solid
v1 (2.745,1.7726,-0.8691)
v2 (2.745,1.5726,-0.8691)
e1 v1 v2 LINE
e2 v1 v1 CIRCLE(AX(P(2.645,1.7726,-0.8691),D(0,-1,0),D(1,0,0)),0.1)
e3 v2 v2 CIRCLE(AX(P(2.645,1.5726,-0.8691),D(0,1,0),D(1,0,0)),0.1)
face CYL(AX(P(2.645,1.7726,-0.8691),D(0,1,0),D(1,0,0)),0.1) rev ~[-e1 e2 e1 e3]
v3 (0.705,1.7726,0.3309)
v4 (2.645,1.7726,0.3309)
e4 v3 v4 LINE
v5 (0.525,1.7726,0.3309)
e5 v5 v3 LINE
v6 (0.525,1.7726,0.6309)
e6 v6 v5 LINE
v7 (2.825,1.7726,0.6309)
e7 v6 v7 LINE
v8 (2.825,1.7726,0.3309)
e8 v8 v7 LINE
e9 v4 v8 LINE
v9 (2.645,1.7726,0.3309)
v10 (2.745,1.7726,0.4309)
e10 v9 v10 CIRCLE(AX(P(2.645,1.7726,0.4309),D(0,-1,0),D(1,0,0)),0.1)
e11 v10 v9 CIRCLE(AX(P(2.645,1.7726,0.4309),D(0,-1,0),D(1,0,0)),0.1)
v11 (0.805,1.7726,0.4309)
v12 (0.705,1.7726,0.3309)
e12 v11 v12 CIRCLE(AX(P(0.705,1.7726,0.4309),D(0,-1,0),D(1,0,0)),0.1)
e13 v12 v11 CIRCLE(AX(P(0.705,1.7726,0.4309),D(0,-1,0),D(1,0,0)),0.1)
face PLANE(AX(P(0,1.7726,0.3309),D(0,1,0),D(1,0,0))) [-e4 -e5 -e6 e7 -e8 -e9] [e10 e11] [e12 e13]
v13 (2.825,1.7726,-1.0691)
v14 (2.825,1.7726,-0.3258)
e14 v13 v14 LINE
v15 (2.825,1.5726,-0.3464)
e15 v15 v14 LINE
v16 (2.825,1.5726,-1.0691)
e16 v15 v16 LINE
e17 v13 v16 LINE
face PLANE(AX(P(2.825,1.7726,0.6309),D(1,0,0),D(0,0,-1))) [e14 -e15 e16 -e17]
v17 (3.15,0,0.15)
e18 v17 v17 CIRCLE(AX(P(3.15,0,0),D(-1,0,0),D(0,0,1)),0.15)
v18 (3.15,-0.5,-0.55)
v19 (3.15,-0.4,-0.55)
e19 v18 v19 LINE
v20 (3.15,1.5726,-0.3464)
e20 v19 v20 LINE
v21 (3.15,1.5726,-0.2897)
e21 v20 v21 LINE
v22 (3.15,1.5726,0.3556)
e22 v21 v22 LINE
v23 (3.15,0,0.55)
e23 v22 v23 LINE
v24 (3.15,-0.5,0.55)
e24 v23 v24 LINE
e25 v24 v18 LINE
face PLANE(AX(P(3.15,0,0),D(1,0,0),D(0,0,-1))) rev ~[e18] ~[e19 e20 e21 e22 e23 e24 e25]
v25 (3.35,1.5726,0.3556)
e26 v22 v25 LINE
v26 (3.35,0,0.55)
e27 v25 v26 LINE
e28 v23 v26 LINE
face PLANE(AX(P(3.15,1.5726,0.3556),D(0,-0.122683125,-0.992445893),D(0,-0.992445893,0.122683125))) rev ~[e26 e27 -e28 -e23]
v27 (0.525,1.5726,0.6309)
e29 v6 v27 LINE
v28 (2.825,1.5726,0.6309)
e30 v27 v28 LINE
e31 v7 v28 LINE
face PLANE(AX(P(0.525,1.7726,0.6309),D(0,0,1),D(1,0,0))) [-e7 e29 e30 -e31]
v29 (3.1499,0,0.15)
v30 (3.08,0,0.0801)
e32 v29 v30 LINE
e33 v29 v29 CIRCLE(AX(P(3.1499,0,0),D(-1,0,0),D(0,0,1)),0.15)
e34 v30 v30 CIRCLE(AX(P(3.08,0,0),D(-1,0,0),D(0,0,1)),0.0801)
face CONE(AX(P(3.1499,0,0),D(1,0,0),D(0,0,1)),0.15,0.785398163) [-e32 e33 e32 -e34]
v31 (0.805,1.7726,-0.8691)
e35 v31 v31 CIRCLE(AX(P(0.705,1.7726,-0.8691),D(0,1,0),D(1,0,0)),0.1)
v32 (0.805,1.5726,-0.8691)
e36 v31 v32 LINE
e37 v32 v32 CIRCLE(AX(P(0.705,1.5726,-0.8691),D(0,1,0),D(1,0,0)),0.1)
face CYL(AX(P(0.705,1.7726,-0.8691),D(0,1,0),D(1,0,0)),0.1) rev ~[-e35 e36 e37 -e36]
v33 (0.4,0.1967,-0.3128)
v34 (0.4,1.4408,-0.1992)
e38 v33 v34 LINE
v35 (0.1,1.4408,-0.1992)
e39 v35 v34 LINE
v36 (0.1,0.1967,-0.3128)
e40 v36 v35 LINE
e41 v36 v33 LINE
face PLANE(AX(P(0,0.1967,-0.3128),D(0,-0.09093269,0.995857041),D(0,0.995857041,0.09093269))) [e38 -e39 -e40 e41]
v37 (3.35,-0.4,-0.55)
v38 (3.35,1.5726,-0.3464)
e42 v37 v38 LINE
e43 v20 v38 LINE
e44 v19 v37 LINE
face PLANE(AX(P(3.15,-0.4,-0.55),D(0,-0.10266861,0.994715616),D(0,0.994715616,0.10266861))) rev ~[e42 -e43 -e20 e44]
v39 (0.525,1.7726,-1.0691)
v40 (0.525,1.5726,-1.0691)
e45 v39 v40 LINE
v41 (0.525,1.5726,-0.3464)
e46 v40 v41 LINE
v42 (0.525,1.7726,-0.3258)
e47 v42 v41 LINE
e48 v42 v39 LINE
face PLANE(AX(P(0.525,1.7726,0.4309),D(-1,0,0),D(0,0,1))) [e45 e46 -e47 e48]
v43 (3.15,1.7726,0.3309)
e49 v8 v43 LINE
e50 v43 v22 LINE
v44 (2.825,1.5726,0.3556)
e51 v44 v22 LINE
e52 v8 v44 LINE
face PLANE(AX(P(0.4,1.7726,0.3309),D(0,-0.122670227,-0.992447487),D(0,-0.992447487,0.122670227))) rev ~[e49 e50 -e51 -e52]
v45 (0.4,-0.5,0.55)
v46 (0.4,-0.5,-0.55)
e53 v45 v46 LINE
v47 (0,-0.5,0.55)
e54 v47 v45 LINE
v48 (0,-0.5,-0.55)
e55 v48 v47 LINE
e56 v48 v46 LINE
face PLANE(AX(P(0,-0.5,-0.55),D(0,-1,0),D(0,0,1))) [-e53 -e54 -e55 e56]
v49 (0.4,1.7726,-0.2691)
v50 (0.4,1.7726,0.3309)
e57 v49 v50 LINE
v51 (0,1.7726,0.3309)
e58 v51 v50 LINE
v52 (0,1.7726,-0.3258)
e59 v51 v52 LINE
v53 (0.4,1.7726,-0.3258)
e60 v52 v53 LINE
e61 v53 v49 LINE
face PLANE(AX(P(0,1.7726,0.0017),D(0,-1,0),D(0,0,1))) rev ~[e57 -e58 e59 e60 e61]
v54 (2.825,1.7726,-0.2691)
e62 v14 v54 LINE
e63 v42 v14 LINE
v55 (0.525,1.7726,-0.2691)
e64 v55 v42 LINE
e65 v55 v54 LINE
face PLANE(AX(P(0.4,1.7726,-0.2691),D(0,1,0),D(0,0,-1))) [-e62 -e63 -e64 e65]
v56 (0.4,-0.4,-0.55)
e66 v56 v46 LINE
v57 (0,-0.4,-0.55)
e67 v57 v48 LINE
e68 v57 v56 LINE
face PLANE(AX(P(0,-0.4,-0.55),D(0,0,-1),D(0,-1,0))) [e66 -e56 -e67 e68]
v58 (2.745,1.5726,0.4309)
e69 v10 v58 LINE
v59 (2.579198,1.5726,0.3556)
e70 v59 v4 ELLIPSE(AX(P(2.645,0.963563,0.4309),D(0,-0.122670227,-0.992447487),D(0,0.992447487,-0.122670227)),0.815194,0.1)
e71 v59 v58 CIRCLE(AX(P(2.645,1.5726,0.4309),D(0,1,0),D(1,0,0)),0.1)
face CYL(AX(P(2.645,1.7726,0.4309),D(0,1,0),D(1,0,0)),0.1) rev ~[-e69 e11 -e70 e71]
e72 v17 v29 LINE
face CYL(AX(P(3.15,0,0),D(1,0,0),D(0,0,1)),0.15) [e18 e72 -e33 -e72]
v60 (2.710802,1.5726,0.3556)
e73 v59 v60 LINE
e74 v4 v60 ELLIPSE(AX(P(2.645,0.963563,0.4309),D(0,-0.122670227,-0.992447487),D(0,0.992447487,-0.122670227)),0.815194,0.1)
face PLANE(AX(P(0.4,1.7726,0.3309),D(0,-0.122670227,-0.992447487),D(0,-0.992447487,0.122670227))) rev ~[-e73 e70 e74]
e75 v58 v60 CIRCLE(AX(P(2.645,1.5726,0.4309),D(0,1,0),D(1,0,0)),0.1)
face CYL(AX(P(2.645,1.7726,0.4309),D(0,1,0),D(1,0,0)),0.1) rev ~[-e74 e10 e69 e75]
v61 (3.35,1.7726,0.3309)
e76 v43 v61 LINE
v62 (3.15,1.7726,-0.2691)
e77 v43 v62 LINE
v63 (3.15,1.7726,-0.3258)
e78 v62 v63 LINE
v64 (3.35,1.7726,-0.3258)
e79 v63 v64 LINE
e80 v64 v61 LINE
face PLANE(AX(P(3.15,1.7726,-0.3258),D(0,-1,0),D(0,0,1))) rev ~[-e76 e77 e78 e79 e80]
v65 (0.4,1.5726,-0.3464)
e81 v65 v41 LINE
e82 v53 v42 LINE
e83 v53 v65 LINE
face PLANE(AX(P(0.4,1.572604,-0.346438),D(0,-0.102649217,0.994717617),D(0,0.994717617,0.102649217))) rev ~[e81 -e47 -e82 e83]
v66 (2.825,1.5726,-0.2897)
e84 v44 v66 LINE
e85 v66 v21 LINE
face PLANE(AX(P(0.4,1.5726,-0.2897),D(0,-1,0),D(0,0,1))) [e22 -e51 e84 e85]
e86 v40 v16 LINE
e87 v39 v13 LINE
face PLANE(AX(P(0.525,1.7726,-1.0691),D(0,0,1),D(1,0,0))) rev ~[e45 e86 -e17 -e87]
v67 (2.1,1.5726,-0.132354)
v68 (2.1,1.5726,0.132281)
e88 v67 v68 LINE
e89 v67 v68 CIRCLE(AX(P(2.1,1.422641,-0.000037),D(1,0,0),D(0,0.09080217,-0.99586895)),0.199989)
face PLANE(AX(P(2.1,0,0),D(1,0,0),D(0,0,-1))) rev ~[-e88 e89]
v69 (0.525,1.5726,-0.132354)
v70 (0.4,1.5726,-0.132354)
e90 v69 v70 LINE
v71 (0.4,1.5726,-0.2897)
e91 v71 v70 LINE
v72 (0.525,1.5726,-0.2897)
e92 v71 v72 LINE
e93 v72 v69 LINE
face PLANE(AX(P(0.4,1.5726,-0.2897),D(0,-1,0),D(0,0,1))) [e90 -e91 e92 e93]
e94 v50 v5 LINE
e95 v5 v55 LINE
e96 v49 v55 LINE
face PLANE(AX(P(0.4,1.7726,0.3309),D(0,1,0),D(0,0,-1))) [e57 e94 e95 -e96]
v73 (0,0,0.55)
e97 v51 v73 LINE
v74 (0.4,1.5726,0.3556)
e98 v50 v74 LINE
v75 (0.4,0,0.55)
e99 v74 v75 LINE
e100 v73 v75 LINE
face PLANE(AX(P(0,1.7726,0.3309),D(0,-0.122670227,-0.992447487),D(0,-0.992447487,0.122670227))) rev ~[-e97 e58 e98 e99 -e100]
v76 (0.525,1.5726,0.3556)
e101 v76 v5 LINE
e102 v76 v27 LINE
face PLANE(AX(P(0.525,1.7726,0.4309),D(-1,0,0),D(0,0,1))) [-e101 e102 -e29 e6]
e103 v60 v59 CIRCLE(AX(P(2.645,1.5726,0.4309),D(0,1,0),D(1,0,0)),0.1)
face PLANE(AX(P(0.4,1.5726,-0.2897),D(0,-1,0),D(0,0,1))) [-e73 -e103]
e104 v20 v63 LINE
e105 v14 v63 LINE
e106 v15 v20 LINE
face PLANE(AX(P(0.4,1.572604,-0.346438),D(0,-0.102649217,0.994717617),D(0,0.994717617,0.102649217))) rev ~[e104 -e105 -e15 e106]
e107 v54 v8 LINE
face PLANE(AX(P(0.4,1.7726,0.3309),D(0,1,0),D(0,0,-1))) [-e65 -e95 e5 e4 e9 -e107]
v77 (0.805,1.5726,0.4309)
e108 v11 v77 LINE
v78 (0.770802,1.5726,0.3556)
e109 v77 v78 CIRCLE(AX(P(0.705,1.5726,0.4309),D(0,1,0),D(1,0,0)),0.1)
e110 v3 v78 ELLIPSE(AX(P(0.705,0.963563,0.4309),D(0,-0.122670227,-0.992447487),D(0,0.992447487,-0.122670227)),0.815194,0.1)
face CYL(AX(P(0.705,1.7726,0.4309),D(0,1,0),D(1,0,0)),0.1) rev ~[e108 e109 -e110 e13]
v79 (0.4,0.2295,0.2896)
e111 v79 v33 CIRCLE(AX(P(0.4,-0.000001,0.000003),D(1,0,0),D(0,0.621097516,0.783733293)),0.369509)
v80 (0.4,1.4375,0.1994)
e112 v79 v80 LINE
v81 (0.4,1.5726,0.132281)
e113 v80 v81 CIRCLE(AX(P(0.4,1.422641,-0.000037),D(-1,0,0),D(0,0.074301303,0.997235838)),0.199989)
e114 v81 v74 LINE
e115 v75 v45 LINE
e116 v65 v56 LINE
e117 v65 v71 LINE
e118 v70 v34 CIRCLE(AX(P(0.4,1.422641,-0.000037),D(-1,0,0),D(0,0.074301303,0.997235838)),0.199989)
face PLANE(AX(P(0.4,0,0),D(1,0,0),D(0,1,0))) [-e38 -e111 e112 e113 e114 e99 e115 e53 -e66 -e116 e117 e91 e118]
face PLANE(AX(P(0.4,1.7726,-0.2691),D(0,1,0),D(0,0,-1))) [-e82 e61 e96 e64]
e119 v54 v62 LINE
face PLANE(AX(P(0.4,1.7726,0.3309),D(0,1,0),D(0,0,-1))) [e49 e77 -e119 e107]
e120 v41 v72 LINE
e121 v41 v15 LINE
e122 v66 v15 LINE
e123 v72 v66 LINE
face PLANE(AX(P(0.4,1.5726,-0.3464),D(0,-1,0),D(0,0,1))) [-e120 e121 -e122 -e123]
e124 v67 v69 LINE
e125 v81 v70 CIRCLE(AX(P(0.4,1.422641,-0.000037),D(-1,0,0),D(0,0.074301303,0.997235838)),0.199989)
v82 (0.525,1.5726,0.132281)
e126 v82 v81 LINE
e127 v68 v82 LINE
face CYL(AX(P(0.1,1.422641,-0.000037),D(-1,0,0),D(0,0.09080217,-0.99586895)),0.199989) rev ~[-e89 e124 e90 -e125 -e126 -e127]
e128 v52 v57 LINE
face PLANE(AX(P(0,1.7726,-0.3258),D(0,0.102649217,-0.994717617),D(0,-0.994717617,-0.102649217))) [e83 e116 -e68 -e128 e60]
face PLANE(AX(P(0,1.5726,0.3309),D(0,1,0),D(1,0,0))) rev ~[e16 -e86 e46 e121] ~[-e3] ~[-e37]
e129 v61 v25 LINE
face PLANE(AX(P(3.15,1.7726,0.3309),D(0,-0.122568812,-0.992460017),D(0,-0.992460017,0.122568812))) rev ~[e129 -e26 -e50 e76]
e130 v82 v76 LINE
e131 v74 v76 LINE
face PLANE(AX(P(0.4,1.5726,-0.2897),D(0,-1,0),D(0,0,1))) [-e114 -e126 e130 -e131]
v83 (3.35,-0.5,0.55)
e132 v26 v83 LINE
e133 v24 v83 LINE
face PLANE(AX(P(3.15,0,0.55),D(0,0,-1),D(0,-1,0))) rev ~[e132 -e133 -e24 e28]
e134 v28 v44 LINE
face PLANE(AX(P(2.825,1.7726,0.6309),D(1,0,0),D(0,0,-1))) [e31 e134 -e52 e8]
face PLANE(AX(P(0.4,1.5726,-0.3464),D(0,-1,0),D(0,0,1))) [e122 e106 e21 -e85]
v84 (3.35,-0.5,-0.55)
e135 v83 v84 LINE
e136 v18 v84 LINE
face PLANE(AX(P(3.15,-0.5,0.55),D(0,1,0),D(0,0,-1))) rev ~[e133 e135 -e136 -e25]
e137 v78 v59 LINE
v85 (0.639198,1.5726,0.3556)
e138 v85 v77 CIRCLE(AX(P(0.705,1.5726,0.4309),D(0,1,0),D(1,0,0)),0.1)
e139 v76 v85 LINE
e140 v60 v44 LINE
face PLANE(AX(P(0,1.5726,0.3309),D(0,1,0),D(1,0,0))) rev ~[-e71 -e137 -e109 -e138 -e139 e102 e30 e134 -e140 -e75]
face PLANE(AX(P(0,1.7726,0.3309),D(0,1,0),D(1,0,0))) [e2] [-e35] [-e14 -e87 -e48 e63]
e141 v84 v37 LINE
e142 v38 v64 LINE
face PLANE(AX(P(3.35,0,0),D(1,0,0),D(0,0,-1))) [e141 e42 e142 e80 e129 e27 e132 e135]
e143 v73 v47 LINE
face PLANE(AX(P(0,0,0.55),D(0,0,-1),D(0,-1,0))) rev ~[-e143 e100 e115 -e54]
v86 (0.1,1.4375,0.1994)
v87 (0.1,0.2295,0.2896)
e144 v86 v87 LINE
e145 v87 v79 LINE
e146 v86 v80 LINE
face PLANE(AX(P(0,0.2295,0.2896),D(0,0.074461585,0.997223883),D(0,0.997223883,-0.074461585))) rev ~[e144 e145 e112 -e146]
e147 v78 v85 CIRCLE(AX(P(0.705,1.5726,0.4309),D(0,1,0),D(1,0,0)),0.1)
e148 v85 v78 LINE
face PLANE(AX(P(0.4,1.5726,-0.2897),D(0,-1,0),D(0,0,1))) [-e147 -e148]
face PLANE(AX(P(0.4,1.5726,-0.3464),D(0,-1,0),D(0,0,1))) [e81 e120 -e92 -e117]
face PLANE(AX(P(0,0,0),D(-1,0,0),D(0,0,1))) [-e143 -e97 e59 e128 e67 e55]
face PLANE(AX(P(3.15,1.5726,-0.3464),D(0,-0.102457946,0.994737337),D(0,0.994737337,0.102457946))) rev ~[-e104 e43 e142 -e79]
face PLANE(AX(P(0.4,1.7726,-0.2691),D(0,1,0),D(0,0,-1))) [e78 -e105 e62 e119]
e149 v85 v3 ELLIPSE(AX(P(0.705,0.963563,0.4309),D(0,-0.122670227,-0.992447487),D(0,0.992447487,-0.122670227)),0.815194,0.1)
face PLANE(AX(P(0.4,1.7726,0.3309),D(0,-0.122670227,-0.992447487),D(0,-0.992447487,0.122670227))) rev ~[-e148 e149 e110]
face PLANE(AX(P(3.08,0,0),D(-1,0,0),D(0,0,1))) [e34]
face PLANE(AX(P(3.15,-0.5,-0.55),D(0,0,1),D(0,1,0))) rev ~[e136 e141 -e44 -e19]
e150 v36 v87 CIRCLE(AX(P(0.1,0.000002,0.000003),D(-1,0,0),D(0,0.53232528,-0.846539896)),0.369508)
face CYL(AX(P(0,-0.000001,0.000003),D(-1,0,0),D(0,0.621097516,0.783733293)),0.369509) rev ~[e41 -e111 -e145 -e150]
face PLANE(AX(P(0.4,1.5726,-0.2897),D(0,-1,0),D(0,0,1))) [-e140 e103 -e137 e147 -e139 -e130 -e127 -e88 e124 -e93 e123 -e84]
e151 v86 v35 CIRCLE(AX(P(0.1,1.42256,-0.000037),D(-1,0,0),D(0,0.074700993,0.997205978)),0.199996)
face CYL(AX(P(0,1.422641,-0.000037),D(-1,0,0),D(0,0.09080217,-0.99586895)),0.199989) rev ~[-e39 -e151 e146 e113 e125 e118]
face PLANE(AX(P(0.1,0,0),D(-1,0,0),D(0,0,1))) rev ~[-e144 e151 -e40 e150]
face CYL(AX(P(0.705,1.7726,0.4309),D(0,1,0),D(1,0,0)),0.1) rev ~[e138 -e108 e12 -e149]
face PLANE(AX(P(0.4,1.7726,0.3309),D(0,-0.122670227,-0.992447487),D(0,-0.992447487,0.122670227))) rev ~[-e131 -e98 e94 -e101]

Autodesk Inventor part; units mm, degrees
ref_plane "YZ Plane" through (0, 0, 0) normal (1, 0, 0) x (0, 1, 0)
ref_plane "XZ Plane" through (0, 0, 0) normal (0, 1, 0) x (-1, 0, 0)
ref_plane "XY Plane" through (0, 0, 0) normal (0, 0, 1) x (1, 0, 0)
sketch "Boceto1" plane through (0, 0, 0) normal (1, 0, 0) x (0, 1, 0)
  arc A0 (0.2295, 0.2896) -> (0.1967, -0.3128) centre (0, 0) ccw
  arc A1 (1.4408, -0.1992) -> (1.4375, 0.1994) centre (1.4226, 0) ccw
  line L0 (0.2295, 0.2896) -> (1.4375, 0.1994)
  line L1 (0.1967, -0.3128) -> (1.4408, -0.1992)
  circle A2 centre (0, 0) radius 0.3
  line L2 (0, 0) -> (0, 0.55)
  line L3 (1.7726, 0.3309) -> (0, 0.55)
  line L4 (0, 0.55) -> (-0.5, 0.55)
  line L5 (-0.5, 0.55) -> (-0.5, 0)
  line L6 (1.7726, -0.3258) -> (-0.4, -0.55)
  line L7 (-0.4, -0.55) -> (-0.5, -0.55)
  line L8 (-0.5, -0.55) -> (-0.5, 0)
  line L9 (1.6226, 0.0017) -> (1.7726, 0.0017)
  line L10 (1.7726, 0.0017) -> (1.7726, 0.3309)
  line L11 (1.7726, 0.3309) -> (1.7726, -0.3258)
  dimension "d0" = 0.55
  dimension "d3" = 0.5
extrude "Extrusión1" add sketch "Boceto1" along normal blind 0.4 contours A0 L2 L3 L10 L9 A1 L0 | A0 L1 A1 L9 L11 L6 L7 L8 L5 L4 L2
sketch "Boceto2" plane through (0, 0, 0) normal (-1, 0, 0) x (0, 0, 1)
  line L0 (0.1994, 1.4375) -> (0.2896, 0.2295) projected
  arc A0 (-0.3128, 0.1967) -> (0.2896, 0.2295) centre (0, 0) ccw projected
  line L1 (-0.3128, 0.1967) -> (-0.1992, 1.4408) projected
  arc A1 (0.1994, 1.4375) -> (-0.1992, 1.4408) centre (0, 1.4226) ccw projected
  line L2 (0.3309, 1.7726) -> (0.55, 0) projected
  line L3 (-0.55, -0.4) -> (-0.3258, 1.7726) projected
  line L4 (-0.55, -0.5) -> (-0.55, -0.4) projected
  line L5 (0.55, -0.5) -> (-0.55, -0.5) projected
  line L6 (0.55, 0) -> (0.55, -0.5) projected
  line L7 (-0.3258, 1.7726) -> (0.3309, 1.7726) projected
extrude "Extrusión2" add sketch "Boceto2" against normal blind 0.1 contours L0 A0 L1 A1
sketch "Boceto3" plane through (0.4, 0, 0) normal (1, 0, 0) x (0, 0, -1)
  line L0 (-0.3, 2.0226) -> (0.3, 2.0226) projected
  line L1 (-0.3309, 1.7726) -> (-0.55, 0) projected
  line L2 (0.55, -0.4) -> (0.3258, 1.7726) projected
  line L3 (-0.3309, 1.7726) -> (-0.55, 0) projected
  line L4 (-0.3309, 1.7726) -> (0.3258, 1.7726)
  line L5 (0.55, -0.4) -> (0.3258, 1.7726) projected
  line L6 (0.2897, 1.5726) -> (0.2691, 1.7726)
  line L7 (0.3464, 1.5726) -> (-0.3556, 1.5726)
  line L8 (-0.3309, 1.7726) -> (-0.3556, 1.5726)
  line L9 (0.3258, 1.7726) -> (0.3464, 1.5726)
  point P0 (0, 0)
  point P1 (-0.3068, 1.9676)
extrude "Extrusión3" add sketch "Boceto3" along normal blind 2.75
sketch "Boceto4" plane through (3.15, 0, 0) normal (1, 0, 0) x (0, 0, -1)
  line L0 (-0.3556, 1.5726) -> (-0.55, 0) projected
  line L1 (-0.55, 0) -> (-0.55, -0.5) projected
  line L2 (-0.55, -0.5) -> (0.55, -0.5) projected
  line L3 (0.55, -0.5) -> (0.55, -0.4) projected
  line L4 (0.55, -0.4) -> (0.3464, 1.5726) projected
  line L5 (-0.2896, 0.2295) -> (-0.1994, 1.4375) projected
  arc A0 (-0.1323, 1.5726) -> (-0.1994, 1.4375) centre (0, 1.4226) ccw projected
  line L6 (0.1992, 1.4408) -> (0.3128, 0.1967) projected
  arc A1 (-0.2896, 0.2295) -> (0.3128, 0.1967) centre (0, 0) ccw projected
  line L7 (0.3258, 1.7726) -> (-0.3309, 1.7726) projected
  line L8 (-0.3556, 1.5726) -> (0.3464, 1.5726) projected
  line L9 (-0.3309, 1.7726) -> (-0.3556, 1.5726) projected
  line L10 (0.3464, 1.5726) -> (0.1323, 1.5726) projected
  arc A2 (0.1992, 1.4408) -> (0.1323, 1.5726) centre (0, 1.4226) ccw projected
  line L11 (-0.1323, 1.5726) -> (-0.3556, 1.5726) projected
  line L12 (0.3464, 1.5726) -> (0.3258, 1.7726) projected
  line L13 (-0.3309, 1.7726) -> (-0.55, 0) projected
  line L14 (0.3258, 1.7726) -> (-0.3309, 1.7726) projected
  line L15 (0.55, -0.4) -> (0.3258, 1.7726) projected
  line L16 (0.55, -0.5) -> (0.55, -0.4) projected
  line L17 (-0.55, -0.5) -> (0.55, -0.5) projected
  line L18 (-0.55, 0) -> (-0.55, -0.5) projected
  line L19 (0.3464, 1.5726) -> (0.1323, 1.5726) projected
  arc A3 (0.1992, 1.4408) -> (0.1323, 1.5726) centre (0, 1.4226) ccw projected
  line L20 (0.1992, 1.4408) -> (0.3128, 0.1967) projected
  arc A4 (-0.2896, 0.2295) -> (0.3128, 0.1967) centre (0, 0) ccw projected
  line L21 (-0.2896, 0.2295) -> (-0.1994, 1.4375) projected
  arc A5 (-0.1323, 1.5726) -> (-0.1994, 1.4375) centre (0, 1.4226) ccw projected
  line L22 (-0.1323, 1.5726) -> (-0.3556, 1.5726) projected
  line L23 (-0.3556, 1.5726) -> (-0.55, 0) projected
  line L24 (-0.55, 0) -> (-0.55, -0.5) projected
  line L25 (-0.55, -0.5) -> (0.55, -0.5) projected
  line L26 (0.55, -0.5) -> (0.55, -0.4) projected
  line L27 (0.55, -0.4) -> (0.3464, 1.5726) projected
extrude "Extrusión4" add sketch "Boceto4" along normal blind 0.2
sketch "Boceto5" plane through (3.15, 0, 0) normal (-1, 0, 0) x (0, 0, 1)
  line L0 (0.2896, 0.2295) -> (0.1994, 1.4375) projected
  arc A0 (-0.3128, 0.1967) -> (0.2896, 0.2295) centre (0, 0) ccw projected
  line L1 (-0.1992, 1.4408) -> (-0.3128, 0.1967) projected
  arc A1 (0.1994, 1.4375) -> (-0.1992, 1.4408) centre (0, 1.4226) ccw projected
  circle A2 centre (0, 0) radius 0.3695
  circle A3 centre (0, 0) radius 0.15
  dimension "d13" = 0.3
extrude "Extrusión5" add sketch "Boceto5" along normal blind 0.07 contours A3
chamfer "Chaflán1" distance 0.07 angle 45 1 edges at (3.08, 0, -0.15)
sketch "Boceto8" plane through (0, 1.7726, 0.3309) normal (0, 1, 0) x (1, 0, 0)
  line L0 (3.35, 0.6567) -> (3.35, 0) projected
  circle A0 centre (0.705, 1.2) radius 0.1
  circle A1 centre (2.645, 1.2) radius 0.1
  line L1 (2.825, -0.3) -> (2.825, 1.4)
  line L2 (0.525, 1.4) -> (0.525, -0.3)
  line L3 (0.525, -0.3) -> (0.525, 1.2)
  line L4 (0.525, -0.1) -> (0.705, -0.1)
  circle A2 centre (0.705, -0.1) radius 0.1
  circle A3 centre (2.645, -0.1) radius 0.1
  line L5 (0.525, -0.3) -> (0.525, -0.1)
  line L6 (0.525, -0.3) -> (2.825, -0.3)
  line L7 (2.645, -0.1) -> (2.645, 0)
  line L8 (2.645, 0) -> (0.705, 0)
  line L9 (0, 0) -> (3.35, 0) projected
  line L10 (3.35, 0) -> (0, 0)
  line L11 (2.645, -0.1) -> (2.645, 1.2)
  line L12 (0.525, 1.4) -> (2.825, 1.4)
  dimension "d65" = 0.2
  dimension "d63" = 0.2
  dimension "d64" = 0.18
  dimension "d66" = 1.5
  dimension "d67" = 0.2
extrude "Extrusión8" add sketch "Boceto8" against normal blind 0.2 contours L6 L2 L4 A2 L8 L9 L1 | L9 L8 L2 L12 L1 | L2 L9 A2 L4
sketch "Boceto9" plane through (0.1, 0, 0) normal (1, 0, 0) x (0, 0, -1)
  line L0 (-0.2896, 0.2295) -> (-0.1994, 1.4375) projected
  arc A0 (-0.2896, 0.2295) -> (0.3128, 0.1967) centre (0, 0) ccw projected
  line L1 (0.1992, 1.4408) -> (0.3128, 0.1967) projected
  arc A1 (0.1992, 1.4408) -> (-0.1994, 1.4375) centre (0, 1.4226) ccw projected
extrude "Extrusión9" cut sketch "Boceto9" along normal blind 2
properties part number "soporteCamaraB"
